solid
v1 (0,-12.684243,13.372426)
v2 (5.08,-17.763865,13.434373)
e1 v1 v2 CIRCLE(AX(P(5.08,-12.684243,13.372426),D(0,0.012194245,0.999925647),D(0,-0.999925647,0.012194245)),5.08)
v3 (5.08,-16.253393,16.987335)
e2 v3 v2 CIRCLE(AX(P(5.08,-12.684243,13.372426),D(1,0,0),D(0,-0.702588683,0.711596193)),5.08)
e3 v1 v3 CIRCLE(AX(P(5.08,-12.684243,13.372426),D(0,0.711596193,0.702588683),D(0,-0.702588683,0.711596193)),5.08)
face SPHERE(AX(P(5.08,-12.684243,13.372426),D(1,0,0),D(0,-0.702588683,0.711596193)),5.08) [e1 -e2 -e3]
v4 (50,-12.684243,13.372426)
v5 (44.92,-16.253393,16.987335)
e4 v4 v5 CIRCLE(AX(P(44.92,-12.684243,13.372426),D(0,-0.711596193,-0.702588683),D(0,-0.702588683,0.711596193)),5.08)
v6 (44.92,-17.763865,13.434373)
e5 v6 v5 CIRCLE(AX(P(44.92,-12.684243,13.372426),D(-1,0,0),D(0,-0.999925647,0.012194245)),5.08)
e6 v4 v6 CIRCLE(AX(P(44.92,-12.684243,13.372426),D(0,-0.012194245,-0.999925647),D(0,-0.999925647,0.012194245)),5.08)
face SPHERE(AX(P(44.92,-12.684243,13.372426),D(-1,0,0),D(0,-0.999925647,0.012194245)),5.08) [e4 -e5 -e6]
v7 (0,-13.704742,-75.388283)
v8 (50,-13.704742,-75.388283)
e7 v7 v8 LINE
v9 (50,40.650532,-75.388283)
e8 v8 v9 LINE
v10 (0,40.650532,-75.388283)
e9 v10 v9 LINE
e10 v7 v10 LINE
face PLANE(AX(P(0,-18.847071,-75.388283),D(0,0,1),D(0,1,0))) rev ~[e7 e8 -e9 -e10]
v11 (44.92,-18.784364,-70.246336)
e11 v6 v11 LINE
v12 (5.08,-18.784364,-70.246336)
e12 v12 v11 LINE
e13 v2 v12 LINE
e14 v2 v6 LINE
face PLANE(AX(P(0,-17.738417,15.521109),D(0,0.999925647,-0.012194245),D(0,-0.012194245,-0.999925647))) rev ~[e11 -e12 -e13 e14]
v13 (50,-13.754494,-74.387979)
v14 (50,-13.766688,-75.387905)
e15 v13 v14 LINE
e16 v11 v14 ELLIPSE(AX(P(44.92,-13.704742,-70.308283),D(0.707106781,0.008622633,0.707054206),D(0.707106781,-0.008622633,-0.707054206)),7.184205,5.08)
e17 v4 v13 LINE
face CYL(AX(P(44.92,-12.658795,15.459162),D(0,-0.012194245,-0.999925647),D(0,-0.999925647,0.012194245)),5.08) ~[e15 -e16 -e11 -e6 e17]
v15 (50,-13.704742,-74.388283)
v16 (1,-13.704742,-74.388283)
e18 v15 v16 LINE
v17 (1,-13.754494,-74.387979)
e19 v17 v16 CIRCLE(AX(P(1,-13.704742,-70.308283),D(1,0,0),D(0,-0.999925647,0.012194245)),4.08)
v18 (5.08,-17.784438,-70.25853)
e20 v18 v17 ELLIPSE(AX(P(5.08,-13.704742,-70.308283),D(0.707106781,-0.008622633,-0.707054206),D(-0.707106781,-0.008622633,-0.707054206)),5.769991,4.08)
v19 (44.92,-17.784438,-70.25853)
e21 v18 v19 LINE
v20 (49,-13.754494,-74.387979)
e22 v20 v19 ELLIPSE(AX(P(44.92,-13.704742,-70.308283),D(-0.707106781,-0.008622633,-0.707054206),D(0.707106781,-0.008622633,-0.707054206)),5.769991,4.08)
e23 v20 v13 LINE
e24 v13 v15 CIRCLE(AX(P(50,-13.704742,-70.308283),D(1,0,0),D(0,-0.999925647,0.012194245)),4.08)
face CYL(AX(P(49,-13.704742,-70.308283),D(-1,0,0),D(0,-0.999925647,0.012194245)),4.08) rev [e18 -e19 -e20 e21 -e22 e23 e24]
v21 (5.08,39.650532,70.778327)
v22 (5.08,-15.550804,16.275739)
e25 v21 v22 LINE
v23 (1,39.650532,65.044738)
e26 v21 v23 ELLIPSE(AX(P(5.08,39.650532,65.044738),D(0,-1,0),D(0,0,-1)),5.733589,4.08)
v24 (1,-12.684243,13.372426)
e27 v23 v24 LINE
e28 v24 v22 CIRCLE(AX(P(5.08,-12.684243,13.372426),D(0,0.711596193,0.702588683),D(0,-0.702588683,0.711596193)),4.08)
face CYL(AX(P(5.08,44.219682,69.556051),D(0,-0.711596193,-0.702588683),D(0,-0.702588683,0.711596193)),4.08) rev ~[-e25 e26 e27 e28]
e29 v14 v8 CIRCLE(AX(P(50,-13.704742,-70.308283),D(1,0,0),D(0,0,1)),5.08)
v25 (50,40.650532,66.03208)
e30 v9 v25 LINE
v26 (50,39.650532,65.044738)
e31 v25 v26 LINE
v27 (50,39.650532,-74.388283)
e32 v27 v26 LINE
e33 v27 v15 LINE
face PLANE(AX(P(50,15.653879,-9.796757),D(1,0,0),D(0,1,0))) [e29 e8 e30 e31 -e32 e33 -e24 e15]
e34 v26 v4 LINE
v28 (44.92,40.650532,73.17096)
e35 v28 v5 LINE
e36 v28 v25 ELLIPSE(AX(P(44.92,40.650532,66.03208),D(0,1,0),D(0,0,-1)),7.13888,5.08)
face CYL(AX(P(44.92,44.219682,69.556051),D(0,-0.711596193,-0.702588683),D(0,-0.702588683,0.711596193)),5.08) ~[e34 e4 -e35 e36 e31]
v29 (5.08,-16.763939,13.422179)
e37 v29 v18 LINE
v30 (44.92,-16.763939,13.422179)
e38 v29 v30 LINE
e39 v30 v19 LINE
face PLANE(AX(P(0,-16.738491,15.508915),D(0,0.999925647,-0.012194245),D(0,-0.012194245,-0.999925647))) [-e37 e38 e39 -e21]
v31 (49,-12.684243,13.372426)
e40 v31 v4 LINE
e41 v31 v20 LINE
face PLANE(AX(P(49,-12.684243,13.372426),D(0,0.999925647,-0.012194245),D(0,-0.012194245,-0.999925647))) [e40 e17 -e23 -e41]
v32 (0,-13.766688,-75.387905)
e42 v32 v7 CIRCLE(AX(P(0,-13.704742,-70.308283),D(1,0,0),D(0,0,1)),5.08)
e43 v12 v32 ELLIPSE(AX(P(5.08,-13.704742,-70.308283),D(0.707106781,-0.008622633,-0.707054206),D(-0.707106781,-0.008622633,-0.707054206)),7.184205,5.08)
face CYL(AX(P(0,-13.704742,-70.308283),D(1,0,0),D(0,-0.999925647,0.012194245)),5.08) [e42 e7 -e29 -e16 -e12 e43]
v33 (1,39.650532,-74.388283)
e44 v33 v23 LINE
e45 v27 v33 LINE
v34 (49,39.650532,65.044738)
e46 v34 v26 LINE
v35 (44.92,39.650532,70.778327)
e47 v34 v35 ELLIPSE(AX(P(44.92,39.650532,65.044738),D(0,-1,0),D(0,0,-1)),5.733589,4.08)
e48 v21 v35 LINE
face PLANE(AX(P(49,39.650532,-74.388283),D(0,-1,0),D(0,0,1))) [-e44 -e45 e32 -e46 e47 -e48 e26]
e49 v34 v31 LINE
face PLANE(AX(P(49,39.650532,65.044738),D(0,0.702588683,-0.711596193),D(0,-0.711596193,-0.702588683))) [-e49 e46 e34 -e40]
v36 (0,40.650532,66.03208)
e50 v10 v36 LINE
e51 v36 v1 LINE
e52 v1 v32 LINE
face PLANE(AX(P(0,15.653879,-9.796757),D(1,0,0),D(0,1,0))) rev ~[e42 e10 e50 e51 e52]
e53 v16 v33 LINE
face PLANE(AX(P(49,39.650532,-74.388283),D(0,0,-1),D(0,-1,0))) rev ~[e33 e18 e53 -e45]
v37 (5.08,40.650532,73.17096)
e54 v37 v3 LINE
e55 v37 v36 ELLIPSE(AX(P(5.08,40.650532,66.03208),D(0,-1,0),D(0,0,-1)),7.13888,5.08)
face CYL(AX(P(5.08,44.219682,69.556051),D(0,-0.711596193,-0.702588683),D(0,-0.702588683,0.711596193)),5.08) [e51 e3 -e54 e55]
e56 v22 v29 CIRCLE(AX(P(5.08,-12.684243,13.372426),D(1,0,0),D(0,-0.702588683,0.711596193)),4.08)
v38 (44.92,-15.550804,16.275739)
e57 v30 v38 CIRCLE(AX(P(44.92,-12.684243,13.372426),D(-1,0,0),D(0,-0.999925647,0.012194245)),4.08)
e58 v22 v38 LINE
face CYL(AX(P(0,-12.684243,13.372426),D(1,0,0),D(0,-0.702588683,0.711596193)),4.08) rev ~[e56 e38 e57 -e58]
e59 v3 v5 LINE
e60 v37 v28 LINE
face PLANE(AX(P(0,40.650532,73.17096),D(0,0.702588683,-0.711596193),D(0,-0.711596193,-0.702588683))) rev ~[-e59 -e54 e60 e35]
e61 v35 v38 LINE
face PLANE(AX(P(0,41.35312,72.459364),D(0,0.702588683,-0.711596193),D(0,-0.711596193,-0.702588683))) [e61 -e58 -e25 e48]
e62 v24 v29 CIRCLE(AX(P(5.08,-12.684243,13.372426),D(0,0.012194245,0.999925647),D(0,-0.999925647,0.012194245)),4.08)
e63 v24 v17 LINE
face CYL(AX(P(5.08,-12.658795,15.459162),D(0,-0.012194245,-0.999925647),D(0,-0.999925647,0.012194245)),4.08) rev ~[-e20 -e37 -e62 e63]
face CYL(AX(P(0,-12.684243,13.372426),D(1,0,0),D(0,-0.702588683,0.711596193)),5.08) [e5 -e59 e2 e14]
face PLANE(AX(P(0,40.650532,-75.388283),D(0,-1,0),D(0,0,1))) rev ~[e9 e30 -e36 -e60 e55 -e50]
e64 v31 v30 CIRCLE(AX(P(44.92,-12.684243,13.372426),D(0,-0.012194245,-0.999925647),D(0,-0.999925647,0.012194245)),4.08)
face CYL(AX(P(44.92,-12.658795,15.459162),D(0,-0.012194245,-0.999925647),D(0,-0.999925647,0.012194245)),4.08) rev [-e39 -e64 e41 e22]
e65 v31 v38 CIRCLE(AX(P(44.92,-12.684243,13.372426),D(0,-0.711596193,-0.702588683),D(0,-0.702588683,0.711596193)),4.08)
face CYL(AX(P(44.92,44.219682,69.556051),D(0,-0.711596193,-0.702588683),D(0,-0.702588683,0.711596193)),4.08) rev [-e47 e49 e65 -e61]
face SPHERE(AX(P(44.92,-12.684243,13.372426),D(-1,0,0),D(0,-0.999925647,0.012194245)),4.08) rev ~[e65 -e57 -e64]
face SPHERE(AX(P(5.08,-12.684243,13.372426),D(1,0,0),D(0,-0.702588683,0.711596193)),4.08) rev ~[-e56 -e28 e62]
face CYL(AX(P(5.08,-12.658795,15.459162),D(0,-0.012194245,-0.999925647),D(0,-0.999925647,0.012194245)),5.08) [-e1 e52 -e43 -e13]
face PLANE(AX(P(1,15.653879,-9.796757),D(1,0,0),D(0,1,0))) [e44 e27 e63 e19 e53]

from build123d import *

# Parameters (mm, degrees)
F1_DEPTH = 50
F2_R     = 5.08
F3_T     = -1


# Not quite as in the source:
# - a shell that OpenCascade refuses in one call is made with other operations: the cavity is built on its own and cut out


with BuildPart() as f1:
    # F0 (on Right) → F1 (new body)
    with BuildSketch(Plane.YZ):
        Polygon((40.6505316496, -75.3882825375), (40.6505316496, 73.1709599495), (-17.738416791, 15.5211091042), (-18.8470706344, -75.3882825375), align=None)
    extrude(amount=F1_DEPTH)

    # F2
    f2_edges = [f1.edges().sort_by_distance(p)[0] for p in [
        (50, -18.292744, -29.933587),
        (50, 11.456057, 44.346035),
        (25, -17.738417, 15.521109),
        (0, 11.456057, 44.346035),
        (25, -18.847071, -75.388283),
        (0, -18.292744, -29.933587),
    ]]
    fillet(f2_edges, radius=F2_R)

    # F3: a shell. OpenCascade refuses it in one call, so the cavity is built on its own and cut out:
    # the body offset inwards by the wall thickness, plus a prism from it out through each open face.
    f3_core = offset(f1.part, amount=F3_T, mode=Mode.PRIVATE)
    f3_exits = [f3_core.faces().sort_by_distance(p)[0] for p in [
        (49, 15.243523, -16.834061),
    ]]
    add(f3_core, mode=Mode.SUBTRACT)
    extrude(f3_exits, amount=-F3_T, mode=Mode.SUBTRACT)


solid = f1.part
